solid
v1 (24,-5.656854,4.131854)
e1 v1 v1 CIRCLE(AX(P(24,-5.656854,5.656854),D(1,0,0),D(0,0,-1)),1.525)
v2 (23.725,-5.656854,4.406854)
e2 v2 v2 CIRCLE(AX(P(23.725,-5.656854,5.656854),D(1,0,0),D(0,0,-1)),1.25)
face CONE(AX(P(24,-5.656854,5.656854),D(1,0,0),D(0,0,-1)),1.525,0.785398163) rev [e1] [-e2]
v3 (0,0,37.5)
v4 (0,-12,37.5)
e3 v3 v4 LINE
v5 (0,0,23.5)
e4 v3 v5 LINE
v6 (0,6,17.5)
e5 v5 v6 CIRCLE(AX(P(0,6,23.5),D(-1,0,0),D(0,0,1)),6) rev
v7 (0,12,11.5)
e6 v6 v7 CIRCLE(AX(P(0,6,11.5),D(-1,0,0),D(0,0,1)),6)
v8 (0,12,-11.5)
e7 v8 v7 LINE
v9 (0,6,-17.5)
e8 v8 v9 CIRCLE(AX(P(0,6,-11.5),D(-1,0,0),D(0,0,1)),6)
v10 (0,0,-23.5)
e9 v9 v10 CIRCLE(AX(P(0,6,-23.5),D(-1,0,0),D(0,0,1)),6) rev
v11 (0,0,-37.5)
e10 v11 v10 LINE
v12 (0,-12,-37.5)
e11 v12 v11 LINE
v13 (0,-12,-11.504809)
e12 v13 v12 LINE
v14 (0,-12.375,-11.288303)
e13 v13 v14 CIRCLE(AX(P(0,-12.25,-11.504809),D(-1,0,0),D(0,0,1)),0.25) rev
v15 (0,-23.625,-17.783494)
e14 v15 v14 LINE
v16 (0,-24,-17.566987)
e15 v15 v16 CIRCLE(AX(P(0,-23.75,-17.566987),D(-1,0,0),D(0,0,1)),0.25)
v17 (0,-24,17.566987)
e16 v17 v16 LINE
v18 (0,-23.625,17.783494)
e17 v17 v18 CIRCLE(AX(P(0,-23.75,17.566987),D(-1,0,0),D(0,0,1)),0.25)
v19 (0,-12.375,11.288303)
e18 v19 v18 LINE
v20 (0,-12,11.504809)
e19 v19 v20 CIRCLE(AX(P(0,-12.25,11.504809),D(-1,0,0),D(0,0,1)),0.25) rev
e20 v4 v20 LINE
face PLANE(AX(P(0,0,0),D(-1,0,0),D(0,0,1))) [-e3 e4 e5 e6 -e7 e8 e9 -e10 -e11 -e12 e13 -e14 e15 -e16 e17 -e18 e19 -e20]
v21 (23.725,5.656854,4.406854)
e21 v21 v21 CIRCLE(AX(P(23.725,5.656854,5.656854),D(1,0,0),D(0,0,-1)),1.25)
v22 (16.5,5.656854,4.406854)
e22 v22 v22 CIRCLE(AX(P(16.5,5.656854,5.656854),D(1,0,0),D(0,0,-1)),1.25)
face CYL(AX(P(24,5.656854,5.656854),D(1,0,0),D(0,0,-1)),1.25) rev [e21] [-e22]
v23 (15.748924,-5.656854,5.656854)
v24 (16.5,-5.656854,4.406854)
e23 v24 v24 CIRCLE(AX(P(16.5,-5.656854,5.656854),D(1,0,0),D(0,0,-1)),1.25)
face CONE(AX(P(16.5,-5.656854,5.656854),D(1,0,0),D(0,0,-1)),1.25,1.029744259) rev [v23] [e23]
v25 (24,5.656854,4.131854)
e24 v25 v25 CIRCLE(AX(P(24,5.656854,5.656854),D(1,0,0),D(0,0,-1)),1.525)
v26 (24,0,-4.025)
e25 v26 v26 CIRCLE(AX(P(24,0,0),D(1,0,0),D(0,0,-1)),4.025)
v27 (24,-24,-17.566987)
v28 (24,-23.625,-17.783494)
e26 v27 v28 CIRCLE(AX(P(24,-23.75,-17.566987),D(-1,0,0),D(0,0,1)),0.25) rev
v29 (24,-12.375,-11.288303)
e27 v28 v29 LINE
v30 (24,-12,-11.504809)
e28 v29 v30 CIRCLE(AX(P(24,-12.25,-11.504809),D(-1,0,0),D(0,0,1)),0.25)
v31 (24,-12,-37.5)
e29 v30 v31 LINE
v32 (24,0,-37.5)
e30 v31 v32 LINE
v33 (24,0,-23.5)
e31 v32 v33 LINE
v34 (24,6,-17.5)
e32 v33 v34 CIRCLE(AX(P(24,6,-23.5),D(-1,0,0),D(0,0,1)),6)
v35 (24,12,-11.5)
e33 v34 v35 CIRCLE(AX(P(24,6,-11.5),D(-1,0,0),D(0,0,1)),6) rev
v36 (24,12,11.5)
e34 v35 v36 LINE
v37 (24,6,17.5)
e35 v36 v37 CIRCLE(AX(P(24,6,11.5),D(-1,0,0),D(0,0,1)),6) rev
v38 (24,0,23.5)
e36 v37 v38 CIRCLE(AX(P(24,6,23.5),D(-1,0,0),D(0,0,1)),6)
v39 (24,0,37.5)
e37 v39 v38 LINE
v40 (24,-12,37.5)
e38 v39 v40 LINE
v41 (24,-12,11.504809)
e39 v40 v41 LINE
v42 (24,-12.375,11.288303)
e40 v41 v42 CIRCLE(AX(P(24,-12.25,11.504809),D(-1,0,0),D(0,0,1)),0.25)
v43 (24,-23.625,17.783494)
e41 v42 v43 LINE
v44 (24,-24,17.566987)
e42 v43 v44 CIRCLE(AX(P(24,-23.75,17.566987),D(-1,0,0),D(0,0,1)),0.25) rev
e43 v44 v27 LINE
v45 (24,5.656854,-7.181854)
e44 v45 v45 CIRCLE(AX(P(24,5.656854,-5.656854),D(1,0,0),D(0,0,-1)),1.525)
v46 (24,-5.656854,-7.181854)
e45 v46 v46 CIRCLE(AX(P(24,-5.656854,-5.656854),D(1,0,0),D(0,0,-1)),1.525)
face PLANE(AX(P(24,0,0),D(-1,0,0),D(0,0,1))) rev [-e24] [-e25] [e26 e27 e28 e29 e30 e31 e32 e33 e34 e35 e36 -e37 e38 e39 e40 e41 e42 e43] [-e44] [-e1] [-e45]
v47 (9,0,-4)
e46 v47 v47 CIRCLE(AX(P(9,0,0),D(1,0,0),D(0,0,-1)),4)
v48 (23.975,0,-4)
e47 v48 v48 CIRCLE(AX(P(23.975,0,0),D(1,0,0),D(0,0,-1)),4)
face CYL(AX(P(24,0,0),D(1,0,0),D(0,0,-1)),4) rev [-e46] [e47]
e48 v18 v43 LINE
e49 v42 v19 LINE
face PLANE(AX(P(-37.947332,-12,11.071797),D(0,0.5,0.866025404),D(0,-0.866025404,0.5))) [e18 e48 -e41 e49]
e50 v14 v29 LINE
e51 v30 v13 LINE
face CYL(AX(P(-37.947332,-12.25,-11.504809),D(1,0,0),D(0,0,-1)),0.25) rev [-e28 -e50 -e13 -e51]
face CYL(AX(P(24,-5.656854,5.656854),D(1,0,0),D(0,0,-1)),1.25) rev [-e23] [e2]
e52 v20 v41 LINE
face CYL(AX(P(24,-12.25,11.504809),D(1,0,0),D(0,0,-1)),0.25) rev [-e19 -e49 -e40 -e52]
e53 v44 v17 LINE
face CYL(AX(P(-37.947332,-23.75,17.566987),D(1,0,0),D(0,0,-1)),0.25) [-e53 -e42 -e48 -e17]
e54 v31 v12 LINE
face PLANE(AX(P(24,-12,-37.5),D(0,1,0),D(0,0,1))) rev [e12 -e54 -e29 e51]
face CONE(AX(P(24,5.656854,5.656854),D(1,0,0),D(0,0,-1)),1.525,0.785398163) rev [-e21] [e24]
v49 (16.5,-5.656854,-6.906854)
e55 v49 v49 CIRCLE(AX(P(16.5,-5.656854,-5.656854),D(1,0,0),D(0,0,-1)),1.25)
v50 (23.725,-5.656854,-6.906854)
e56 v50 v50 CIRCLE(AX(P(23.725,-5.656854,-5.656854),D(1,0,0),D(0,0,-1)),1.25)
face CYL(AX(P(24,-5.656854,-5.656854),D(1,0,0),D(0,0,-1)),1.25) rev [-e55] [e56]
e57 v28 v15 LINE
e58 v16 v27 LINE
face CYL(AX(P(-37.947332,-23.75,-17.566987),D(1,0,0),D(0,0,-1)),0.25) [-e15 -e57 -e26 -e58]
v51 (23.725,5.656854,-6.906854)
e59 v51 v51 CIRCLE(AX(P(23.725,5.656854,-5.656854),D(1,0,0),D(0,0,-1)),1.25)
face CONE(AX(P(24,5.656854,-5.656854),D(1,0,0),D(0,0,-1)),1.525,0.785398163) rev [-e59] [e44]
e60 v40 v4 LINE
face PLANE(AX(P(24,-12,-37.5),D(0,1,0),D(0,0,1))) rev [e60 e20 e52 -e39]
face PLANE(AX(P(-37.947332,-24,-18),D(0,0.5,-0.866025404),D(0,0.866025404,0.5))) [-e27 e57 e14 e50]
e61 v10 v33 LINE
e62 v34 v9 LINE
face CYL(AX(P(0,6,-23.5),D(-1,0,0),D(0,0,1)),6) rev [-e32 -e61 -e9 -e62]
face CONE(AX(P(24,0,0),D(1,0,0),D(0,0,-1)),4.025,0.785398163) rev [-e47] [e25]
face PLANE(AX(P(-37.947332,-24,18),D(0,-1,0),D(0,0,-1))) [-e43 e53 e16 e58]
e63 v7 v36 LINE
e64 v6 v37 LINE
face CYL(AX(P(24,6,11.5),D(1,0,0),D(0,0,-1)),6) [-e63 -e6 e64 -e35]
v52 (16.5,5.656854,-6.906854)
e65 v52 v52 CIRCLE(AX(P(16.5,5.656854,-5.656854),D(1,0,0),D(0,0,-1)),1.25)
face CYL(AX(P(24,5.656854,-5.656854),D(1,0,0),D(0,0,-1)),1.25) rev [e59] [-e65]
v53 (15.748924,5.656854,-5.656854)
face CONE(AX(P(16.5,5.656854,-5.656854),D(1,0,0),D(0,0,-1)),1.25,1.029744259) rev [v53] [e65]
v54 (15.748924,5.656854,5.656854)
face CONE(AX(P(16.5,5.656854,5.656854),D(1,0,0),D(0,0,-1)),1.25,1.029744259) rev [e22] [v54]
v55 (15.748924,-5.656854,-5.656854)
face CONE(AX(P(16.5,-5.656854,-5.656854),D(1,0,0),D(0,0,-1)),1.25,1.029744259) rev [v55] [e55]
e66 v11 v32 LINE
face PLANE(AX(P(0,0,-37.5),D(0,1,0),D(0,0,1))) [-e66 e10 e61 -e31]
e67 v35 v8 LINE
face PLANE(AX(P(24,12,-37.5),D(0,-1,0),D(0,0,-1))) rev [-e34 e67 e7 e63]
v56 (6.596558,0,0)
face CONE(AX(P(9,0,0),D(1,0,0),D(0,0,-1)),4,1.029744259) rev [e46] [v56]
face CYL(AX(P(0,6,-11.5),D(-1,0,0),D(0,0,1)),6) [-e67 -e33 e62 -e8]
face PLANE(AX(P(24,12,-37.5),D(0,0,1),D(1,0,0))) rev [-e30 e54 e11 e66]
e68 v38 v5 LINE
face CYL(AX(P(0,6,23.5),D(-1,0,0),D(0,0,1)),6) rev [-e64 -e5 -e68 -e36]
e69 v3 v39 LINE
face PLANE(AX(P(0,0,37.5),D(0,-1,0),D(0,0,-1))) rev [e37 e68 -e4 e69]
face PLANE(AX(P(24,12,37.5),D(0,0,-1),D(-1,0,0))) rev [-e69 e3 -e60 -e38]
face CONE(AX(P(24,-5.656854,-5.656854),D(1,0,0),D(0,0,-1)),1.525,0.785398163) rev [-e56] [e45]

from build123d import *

# Parameters (mm, degrees)
SKETCH1_W                       = 75
SKETCH1_H                       = 24
BOSS_EXTRUDE1_DEPTH             = 24
SKETCH2_W                       = 20
SKETCH2_H                       = 12
CUT_EXTRUDE1_DEPTH              = 24
FILLET1_START                   = -1
FILLET1_DEPTH                   = 26
FILLET1_2_DEPTH                 = 24
F_8_0MM_DOWEL_HOLE1_D           = 8
F_8_0MM_DOWEL_HOLE1_DEPTH       = 15
F_8_0MM_DOWEL_HOLE1_CSINK_D     = 8.05
F_8_0MM_DOWEL_HOLE1_CSINK_ANGLE = 90
F_8_0MM_DOWEL_HOLE1_TIP         = 2.403442476
M3X0_5_TAPPED_HOLE1_D           = 2.5
M3X0_5_TAPPED_HOLE1_DEPTH       = 7.5
M3X0_5_TAPPED_HOLE1_CSINK_D     = 3.05
M3X0_5_TAPPED_HOLE1_CSINK_ANGLE = 90
M3X0_5_TAPPED_HOLE1_TIP         = 0.751075774
BOSS_EXTRUDE2_DEPTH             = 24
FILLET2_R                       = 0.25


with BuildPart() as part:
    # Sketch1 → Boss-Extrude1 (new body)
    with BuildSketch(Plane(origin=(0, 0, 0), x_dir=(0, 0, -1), z_dir=(1, 0, 0))):
        Rectangle(SKETCH1_W, SKETCH1_H)
    extrude(amount=BOSS_EXTRUDE1_DEPTH)

    # Sketch2 → Cut-Extrude1 (cut)
    with BuildSketch(Plane(origin=(24, 0, 0), x_dir=(0, 0, -1), z_dir=(1, 0, 0))):
        with Locations((-27.5, 6)):
            Rectangle(SKETCH2_W, SKETCH2_H)
    cut_extrude1 = extrude(amount=-CUT_EXTRUDE1_DEPTH, mode=Mode.SUBTRACT)

    # Fillet1: read off the stored shape, not the designer's step
    # Fillet1 outline → Fillet1 (cut)
    with BuildSketch(Plane.YZ.offset(FILLET1_START)):
        with BuildLine():
            Line((12, 17.5), (6, 17.5))
            ThreePointArc((6, 17.5), (10.242640687, 15.742640687), (12, 11.5))
            Line((12, 11.5), (12, 17.5))
        make_face()
    fillet1 = extrude(amount=FILLET1_DEPTH, mode=Mode.SUBTRACT)

    # Fillet1 2 outline → Fillet1 2 (add)
    with BuildSketch(Plane.YZ):
        with BuildLine():
            Line((0, 17.5), (6, 17.5))
            ThreePointArc((6, 17.5), (1.757359313, 19.257359313), (0, 23.5))
            Line((0, 23.5), (0, 17.5))
        make_face()
    fillet1_2 = extrude(amount=FILLET1_2_DEPTH)

    # Mirror1: Cut-Extrude1, Fillet1, Fillet1 2 across plane
    add(cut_extrude1.mirror(Plane.XY), mode=Mode.SUBTRACT)
    add(fillet1.mirror(Plane.XY), mode=Mode.SUBTRACT)
    add(fillet1_2.mirror(Plane.XY))

    # Ø8.0mm Dowel Hole1
    with Locations(Plane(origin=(24, 0, 0), x_dir=(0, 0, -1), z_dir=(1, 0, 0))):
        with Locations((0, 0)):
            CounterSinkHole(F_8_0MM_DOWEL_HOLE1_D / 2, F_8_0MM_DOWEL_HOLE1_CSINK_D / 2, depth=F_8_0MM_DOWEL_HOLE1_DEPTH, counter_sink_angle=F_8_0MM_DOWEL_HOLE1_CSINK_ANGLE)
            with Locations((0, 0, -(F_8_0MM_DOWEL_HOLE1_DEPTH + F_8_0MM_DOWEL_HOLE1_TIP / 2))):  # 118° drill point
                Cone(0, F_8_0MM_DOWEL_HOLE1_D / 2, F_8_0MM_DOWEL_HOLE1_TIP, mode=Mode.SUBTRACT)

    # M3x0.5 Tapped Hole1
    with Locations(Plane(origin=(24, 0, 0), x_dir=(0, 0, -1), z_dir=(1, 0, 0))):
        with Locations((-5.656854249, 5.656854249), (5.656854249, 5.656854249), (5.656854249, -5.656854249), (-5.656854249, -5.656854249)):
            CounterSinkHole(M3X0_5_TAPPED_HOLE1_D / 2, M3X0_5_TAPPED_HOLE1_CSINK_D / 2, depth=M3X0_5_TAPPED_HOLE1_DEPTH, counter_sink_angle=M3X0_5_TAPPED_HOLE1_CSINK_ANGLE)
            with Locations((0, 0, -(M3X0_5_TAPPED_HOLE1_DEPTH + M3X0_5_TAPPED_HOLE1_TIP / 2))):  # 118° drill point
                Cone(0, M3X0_5_TAPPED_HOLE1_D / 2, M3X0_5_TAPPED_HOLE1_TIP, mode=Mode.SUBTRACT)

    # Sketch12 → Boss-Extrude2 (add)
    with BuildSketch(Plane(origin=(24, 0, 0), x_dir=(0, 0, -1), z_dir=(1, 0, 0))):
        Polygon((-18, -24), (18, -24), (11.07179677, -12), (-11.07179677, -12), align=None)
    extrude(amount=-BOSS_EXTRUDE2_DEPTH)

    # Fillet2
    fillet2_edges = [part.edges().sort_by_distance(p)[0] for p in [
        (12, -12, 11.07179677),
        (12, -24, 18),
        (12, -24, -18),
        (12, -12, -11.07179677),
    ]]
    fillet(fillet2_edges, radius=FILLET2_R)


solid = part.part
